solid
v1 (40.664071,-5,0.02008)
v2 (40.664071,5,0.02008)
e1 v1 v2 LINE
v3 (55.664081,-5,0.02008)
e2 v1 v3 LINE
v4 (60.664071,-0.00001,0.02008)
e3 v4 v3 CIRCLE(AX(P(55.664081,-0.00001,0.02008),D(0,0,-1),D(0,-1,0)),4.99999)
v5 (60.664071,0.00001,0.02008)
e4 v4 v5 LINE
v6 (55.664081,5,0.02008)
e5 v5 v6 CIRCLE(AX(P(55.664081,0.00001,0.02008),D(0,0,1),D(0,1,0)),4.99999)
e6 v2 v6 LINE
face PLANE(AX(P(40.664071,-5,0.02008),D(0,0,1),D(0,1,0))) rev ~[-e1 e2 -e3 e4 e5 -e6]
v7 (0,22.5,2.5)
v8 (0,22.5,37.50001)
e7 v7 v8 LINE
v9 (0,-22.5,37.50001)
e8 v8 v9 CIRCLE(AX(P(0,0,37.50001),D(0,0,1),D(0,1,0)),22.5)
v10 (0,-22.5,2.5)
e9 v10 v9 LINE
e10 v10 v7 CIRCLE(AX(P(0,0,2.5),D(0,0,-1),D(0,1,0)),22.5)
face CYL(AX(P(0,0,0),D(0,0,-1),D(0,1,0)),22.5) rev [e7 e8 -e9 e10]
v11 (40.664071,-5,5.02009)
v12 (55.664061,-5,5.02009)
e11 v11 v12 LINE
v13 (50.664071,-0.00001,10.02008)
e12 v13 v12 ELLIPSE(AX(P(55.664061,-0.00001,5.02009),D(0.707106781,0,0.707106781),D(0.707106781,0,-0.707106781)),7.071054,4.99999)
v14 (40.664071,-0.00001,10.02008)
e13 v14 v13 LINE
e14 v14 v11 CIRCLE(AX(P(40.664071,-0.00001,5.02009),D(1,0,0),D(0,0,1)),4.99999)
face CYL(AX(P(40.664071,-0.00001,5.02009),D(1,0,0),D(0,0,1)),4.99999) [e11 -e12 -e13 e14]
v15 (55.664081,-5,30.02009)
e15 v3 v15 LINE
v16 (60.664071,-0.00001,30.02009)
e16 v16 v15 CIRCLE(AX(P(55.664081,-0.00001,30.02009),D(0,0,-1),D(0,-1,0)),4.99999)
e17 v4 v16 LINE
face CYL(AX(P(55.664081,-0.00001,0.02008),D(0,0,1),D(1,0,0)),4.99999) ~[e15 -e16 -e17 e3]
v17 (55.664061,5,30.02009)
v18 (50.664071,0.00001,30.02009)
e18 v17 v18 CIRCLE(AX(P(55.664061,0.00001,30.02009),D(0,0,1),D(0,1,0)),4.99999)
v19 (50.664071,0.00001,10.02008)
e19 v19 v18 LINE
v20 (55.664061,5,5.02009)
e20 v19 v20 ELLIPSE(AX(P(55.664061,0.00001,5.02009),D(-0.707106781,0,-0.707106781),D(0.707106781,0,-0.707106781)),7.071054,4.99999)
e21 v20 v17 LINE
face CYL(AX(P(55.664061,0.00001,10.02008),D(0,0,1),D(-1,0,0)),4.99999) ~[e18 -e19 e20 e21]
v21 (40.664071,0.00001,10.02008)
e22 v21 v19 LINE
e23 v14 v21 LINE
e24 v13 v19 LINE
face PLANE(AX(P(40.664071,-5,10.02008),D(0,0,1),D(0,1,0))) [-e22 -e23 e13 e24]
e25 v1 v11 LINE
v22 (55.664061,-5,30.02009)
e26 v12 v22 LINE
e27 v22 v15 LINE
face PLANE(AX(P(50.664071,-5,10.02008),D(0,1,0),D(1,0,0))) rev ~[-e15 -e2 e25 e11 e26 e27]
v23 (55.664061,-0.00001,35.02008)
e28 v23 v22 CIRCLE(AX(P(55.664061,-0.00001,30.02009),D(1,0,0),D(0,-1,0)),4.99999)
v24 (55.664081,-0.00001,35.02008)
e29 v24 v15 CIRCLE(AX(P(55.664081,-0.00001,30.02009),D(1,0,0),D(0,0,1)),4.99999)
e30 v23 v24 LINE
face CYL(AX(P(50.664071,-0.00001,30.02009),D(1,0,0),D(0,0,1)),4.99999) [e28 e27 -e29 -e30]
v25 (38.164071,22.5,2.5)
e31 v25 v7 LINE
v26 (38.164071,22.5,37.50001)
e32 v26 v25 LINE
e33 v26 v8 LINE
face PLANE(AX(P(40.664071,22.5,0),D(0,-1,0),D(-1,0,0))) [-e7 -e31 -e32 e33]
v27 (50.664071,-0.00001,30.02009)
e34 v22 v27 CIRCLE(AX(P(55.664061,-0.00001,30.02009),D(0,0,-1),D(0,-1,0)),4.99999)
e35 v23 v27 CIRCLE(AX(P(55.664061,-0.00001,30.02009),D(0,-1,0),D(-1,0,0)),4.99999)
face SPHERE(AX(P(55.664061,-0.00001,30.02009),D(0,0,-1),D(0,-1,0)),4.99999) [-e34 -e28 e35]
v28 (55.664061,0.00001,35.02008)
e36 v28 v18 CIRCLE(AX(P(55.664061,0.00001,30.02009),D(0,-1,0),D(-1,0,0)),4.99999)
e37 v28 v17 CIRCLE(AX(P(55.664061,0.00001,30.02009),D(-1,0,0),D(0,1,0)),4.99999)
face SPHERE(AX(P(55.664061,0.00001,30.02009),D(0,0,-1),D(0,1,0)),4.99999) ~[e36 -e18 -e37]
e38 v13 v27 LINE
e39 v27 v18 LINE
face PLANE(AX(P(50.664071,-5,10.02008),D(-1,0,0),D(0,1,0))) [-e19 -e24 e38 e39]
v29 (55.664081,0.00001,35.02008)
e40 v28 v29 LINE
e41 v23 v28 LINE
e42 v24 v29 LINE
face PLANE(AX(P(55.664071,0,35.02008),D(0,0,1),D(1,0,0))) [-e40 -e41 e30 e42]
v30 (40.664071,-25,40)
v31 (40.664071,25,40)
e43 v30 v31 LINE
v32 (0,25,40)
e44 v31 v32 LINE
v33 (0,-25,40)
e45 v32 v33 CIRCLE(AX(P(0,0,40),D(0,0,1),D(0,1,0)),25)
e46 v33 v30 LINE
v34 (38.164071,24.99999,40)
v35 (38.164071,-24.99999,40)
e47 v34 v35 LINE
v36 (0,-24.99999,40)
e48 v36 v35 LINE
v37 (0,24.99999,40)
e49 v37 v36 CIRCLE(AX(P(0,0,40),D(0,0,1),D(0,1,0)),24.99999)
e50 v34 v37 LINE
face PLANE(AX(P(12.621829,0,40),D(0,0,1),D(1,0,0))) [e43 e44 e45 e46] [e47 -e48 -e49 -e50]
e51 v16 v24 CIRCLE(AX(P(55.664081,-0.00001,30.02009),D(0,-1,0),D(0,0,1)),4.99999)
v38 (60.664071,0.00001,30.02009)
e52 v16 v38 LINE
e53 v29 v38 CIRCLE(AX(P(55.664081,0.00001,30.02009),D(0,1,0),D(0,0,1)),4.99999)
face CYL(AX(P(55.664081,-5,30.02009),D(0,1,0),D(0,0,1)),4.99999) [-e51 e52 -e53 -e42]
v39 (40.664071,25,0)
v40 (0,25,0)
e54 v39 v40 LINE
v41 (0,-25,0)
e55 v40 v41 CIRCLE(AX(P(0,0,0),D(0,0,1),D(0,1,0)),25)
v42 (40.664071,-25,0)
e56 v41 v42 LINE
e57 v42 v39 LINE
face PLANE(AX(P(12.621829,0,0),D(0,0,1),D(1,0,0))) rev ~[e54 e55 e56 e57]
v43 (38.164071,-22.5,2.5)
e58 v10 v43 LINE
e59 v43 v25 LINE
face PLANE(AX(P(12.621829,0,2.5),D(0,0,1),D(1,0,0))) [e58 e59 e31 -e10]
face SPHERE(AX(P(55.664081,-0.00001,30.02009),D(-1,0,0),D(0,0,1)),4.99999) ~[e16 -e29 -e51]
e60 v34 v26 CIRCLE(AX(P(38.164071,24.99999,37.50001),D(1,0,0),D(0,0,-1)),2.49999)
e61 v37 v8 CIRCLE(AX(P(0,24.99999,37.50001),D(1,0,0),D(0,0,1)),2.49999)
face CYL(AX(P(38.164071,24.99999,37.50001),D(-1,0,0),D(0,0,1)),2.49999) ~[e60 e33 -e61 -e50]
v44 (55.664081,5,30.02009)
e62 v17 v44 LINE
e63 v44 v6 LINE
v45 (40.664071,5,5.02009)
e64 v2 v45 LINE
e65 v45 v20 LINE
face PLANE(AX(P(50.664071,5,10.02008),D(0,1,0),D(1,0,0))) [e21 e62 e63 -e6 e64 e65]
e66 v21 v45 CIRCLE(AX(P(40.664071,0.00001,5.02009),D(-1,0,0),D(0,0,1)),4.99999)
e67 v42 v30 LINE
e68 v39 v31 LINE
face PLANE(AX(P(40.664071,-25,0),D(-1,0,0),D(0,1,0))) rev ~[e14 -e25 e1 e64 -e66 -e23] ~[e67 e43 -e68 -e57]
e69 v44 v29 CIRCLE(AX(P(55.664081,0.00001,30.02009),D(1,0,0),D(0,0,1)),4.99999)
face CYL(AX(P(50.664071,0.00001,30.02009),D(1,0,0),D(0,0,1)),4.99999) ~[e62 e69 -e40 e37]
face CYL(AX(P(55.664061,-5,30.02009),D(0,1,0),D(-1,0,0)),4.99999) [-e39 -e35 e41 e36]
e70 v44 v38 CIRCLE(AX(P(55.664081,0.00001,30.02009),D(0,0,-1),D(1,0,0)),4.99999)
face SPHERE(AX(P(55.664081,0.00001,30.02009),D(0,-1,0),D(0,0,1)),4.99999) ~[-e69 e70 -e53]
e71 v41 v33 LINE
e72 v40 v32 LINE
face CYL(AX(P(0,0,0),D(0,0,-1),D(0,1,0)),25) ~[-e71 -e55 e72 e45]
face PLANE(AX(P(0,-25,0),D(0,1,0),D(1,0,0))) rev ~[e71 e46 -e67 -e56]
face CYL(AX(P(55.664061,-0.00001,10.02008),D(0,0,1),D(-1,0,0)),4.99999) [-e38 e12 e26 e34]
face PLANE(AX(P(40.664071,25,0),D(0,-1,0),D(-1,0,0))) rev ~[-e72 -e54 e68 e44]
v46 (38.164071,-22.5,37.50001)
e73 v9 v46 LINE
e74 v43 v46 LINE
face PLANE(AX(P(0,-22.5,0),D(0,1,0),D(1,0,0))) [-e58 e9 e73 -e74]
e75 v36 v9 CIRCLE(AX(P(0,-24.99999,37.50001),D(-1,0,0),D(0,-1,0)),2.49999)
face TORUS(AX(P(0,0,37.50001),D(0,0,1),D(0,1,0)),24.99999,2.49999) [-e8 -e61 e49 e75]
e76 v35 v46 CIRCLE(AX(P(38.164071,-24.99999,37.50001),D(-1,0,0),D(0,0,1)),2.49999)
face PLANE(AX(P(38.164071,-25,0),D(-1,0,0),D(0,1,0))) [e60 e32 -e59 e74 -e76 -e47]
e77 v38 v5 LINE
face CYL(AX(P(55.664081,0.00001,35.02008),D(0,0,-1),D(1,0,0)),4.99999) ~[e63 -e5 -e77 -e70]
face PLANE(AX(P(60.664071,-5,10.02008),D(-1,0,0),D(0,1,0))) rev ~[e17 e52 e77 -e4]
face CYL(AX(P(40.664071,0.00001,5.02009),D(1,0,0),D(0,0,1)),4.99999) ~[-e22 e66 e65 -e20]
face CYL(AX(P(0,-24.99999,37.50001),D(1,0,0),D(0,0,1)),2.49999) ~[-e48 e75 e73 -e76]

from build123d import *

# Parameters (mm, degrees)
F1_DEPTH = 40
F2_T     = -2.5
F3_W     = 10
F3_H     = 10
F4_DEPTH = 20
F5_W     = 10
F5_H     = 10
F6_DEPTH = 25
F7_R     = 4.99999
F8_R     = 2.49999


# Not quite as in the source:
# - a fillet or chamfer is up to 0.001 mm smaller than in the source, because OpenCascade refuses the exact size


with BuildPart() as f1:
    # F0 (on Top) → F1 (new body)
    with BuildSketch(Plane.XY):
        with BuildLine():
            Line((40.6640707215, 25), (0, 25))
            ThreePointArc((0, 25), (-25, 0), (0, -25))
            Line((0, -25), (40.6640707215, -25))
            Line((40.6640707215, -25), (40.6640707215, 25))
        make_face()
    extrude(amount=F1_DEPTH)

    # F2
    f2_openings = [f1.faces().sort_by_distance(p)[0] for p in [
        (10.256385, 0, 40),
    ]]
    offset(amount=F2_T, openings=f2_openings)

    # F3 (on face) → F4 (join)
    with BuildSketch(Plane.YZ.offset(40.6640707215)):
        with Locations((0, 5.0200799115)):
            Rectangle(F3_W, F3_H)
    extrude(amount=F4_DEPTH)

    # F5 (on face) → F6 (join)
    with BuildSketch(Plane.XY.offset(10.0200799115)):
        with Locations((55.6640707215, 0)):
            Rectangle(F5_W, F5_H)
    extrude(amount=F6_DEPTH)

    # F7 (radius 5 in the source; OpenCascade refuses exactly that, so slightly less here)
    f7_edges = [f1.edges().sort_by_distance(p)[0] for p in [
        (45.664071, -5, 10.02008),
        (45.664071, 5, 10.02008),
        (50.664071, -5, 22.52008),
        (50.664071, 5, 22.52008),
        (55.664071, -5, 35.02008),
        (60.664071, 0, 35.02008),
        (55.664071, 5, 35.02008),
        (50.664071, 0, 35.02008),
        (60.664071, -5, 17.52008),
        (60.664071, 5, 17.52008),
    ]]
    fillet(f7_edges, radius=F7_R)

    # F8 (radius 2.5 in the source; OpenCascade refuses exactly that, so slightly less here)
    f8_edges = [f1.edges().sort_by_distance(p)[0] for p in [
        (-22.5, 0, 40),
    ]]
    fillet(f8_edges, radius=F8_R)


solid = f1.part
